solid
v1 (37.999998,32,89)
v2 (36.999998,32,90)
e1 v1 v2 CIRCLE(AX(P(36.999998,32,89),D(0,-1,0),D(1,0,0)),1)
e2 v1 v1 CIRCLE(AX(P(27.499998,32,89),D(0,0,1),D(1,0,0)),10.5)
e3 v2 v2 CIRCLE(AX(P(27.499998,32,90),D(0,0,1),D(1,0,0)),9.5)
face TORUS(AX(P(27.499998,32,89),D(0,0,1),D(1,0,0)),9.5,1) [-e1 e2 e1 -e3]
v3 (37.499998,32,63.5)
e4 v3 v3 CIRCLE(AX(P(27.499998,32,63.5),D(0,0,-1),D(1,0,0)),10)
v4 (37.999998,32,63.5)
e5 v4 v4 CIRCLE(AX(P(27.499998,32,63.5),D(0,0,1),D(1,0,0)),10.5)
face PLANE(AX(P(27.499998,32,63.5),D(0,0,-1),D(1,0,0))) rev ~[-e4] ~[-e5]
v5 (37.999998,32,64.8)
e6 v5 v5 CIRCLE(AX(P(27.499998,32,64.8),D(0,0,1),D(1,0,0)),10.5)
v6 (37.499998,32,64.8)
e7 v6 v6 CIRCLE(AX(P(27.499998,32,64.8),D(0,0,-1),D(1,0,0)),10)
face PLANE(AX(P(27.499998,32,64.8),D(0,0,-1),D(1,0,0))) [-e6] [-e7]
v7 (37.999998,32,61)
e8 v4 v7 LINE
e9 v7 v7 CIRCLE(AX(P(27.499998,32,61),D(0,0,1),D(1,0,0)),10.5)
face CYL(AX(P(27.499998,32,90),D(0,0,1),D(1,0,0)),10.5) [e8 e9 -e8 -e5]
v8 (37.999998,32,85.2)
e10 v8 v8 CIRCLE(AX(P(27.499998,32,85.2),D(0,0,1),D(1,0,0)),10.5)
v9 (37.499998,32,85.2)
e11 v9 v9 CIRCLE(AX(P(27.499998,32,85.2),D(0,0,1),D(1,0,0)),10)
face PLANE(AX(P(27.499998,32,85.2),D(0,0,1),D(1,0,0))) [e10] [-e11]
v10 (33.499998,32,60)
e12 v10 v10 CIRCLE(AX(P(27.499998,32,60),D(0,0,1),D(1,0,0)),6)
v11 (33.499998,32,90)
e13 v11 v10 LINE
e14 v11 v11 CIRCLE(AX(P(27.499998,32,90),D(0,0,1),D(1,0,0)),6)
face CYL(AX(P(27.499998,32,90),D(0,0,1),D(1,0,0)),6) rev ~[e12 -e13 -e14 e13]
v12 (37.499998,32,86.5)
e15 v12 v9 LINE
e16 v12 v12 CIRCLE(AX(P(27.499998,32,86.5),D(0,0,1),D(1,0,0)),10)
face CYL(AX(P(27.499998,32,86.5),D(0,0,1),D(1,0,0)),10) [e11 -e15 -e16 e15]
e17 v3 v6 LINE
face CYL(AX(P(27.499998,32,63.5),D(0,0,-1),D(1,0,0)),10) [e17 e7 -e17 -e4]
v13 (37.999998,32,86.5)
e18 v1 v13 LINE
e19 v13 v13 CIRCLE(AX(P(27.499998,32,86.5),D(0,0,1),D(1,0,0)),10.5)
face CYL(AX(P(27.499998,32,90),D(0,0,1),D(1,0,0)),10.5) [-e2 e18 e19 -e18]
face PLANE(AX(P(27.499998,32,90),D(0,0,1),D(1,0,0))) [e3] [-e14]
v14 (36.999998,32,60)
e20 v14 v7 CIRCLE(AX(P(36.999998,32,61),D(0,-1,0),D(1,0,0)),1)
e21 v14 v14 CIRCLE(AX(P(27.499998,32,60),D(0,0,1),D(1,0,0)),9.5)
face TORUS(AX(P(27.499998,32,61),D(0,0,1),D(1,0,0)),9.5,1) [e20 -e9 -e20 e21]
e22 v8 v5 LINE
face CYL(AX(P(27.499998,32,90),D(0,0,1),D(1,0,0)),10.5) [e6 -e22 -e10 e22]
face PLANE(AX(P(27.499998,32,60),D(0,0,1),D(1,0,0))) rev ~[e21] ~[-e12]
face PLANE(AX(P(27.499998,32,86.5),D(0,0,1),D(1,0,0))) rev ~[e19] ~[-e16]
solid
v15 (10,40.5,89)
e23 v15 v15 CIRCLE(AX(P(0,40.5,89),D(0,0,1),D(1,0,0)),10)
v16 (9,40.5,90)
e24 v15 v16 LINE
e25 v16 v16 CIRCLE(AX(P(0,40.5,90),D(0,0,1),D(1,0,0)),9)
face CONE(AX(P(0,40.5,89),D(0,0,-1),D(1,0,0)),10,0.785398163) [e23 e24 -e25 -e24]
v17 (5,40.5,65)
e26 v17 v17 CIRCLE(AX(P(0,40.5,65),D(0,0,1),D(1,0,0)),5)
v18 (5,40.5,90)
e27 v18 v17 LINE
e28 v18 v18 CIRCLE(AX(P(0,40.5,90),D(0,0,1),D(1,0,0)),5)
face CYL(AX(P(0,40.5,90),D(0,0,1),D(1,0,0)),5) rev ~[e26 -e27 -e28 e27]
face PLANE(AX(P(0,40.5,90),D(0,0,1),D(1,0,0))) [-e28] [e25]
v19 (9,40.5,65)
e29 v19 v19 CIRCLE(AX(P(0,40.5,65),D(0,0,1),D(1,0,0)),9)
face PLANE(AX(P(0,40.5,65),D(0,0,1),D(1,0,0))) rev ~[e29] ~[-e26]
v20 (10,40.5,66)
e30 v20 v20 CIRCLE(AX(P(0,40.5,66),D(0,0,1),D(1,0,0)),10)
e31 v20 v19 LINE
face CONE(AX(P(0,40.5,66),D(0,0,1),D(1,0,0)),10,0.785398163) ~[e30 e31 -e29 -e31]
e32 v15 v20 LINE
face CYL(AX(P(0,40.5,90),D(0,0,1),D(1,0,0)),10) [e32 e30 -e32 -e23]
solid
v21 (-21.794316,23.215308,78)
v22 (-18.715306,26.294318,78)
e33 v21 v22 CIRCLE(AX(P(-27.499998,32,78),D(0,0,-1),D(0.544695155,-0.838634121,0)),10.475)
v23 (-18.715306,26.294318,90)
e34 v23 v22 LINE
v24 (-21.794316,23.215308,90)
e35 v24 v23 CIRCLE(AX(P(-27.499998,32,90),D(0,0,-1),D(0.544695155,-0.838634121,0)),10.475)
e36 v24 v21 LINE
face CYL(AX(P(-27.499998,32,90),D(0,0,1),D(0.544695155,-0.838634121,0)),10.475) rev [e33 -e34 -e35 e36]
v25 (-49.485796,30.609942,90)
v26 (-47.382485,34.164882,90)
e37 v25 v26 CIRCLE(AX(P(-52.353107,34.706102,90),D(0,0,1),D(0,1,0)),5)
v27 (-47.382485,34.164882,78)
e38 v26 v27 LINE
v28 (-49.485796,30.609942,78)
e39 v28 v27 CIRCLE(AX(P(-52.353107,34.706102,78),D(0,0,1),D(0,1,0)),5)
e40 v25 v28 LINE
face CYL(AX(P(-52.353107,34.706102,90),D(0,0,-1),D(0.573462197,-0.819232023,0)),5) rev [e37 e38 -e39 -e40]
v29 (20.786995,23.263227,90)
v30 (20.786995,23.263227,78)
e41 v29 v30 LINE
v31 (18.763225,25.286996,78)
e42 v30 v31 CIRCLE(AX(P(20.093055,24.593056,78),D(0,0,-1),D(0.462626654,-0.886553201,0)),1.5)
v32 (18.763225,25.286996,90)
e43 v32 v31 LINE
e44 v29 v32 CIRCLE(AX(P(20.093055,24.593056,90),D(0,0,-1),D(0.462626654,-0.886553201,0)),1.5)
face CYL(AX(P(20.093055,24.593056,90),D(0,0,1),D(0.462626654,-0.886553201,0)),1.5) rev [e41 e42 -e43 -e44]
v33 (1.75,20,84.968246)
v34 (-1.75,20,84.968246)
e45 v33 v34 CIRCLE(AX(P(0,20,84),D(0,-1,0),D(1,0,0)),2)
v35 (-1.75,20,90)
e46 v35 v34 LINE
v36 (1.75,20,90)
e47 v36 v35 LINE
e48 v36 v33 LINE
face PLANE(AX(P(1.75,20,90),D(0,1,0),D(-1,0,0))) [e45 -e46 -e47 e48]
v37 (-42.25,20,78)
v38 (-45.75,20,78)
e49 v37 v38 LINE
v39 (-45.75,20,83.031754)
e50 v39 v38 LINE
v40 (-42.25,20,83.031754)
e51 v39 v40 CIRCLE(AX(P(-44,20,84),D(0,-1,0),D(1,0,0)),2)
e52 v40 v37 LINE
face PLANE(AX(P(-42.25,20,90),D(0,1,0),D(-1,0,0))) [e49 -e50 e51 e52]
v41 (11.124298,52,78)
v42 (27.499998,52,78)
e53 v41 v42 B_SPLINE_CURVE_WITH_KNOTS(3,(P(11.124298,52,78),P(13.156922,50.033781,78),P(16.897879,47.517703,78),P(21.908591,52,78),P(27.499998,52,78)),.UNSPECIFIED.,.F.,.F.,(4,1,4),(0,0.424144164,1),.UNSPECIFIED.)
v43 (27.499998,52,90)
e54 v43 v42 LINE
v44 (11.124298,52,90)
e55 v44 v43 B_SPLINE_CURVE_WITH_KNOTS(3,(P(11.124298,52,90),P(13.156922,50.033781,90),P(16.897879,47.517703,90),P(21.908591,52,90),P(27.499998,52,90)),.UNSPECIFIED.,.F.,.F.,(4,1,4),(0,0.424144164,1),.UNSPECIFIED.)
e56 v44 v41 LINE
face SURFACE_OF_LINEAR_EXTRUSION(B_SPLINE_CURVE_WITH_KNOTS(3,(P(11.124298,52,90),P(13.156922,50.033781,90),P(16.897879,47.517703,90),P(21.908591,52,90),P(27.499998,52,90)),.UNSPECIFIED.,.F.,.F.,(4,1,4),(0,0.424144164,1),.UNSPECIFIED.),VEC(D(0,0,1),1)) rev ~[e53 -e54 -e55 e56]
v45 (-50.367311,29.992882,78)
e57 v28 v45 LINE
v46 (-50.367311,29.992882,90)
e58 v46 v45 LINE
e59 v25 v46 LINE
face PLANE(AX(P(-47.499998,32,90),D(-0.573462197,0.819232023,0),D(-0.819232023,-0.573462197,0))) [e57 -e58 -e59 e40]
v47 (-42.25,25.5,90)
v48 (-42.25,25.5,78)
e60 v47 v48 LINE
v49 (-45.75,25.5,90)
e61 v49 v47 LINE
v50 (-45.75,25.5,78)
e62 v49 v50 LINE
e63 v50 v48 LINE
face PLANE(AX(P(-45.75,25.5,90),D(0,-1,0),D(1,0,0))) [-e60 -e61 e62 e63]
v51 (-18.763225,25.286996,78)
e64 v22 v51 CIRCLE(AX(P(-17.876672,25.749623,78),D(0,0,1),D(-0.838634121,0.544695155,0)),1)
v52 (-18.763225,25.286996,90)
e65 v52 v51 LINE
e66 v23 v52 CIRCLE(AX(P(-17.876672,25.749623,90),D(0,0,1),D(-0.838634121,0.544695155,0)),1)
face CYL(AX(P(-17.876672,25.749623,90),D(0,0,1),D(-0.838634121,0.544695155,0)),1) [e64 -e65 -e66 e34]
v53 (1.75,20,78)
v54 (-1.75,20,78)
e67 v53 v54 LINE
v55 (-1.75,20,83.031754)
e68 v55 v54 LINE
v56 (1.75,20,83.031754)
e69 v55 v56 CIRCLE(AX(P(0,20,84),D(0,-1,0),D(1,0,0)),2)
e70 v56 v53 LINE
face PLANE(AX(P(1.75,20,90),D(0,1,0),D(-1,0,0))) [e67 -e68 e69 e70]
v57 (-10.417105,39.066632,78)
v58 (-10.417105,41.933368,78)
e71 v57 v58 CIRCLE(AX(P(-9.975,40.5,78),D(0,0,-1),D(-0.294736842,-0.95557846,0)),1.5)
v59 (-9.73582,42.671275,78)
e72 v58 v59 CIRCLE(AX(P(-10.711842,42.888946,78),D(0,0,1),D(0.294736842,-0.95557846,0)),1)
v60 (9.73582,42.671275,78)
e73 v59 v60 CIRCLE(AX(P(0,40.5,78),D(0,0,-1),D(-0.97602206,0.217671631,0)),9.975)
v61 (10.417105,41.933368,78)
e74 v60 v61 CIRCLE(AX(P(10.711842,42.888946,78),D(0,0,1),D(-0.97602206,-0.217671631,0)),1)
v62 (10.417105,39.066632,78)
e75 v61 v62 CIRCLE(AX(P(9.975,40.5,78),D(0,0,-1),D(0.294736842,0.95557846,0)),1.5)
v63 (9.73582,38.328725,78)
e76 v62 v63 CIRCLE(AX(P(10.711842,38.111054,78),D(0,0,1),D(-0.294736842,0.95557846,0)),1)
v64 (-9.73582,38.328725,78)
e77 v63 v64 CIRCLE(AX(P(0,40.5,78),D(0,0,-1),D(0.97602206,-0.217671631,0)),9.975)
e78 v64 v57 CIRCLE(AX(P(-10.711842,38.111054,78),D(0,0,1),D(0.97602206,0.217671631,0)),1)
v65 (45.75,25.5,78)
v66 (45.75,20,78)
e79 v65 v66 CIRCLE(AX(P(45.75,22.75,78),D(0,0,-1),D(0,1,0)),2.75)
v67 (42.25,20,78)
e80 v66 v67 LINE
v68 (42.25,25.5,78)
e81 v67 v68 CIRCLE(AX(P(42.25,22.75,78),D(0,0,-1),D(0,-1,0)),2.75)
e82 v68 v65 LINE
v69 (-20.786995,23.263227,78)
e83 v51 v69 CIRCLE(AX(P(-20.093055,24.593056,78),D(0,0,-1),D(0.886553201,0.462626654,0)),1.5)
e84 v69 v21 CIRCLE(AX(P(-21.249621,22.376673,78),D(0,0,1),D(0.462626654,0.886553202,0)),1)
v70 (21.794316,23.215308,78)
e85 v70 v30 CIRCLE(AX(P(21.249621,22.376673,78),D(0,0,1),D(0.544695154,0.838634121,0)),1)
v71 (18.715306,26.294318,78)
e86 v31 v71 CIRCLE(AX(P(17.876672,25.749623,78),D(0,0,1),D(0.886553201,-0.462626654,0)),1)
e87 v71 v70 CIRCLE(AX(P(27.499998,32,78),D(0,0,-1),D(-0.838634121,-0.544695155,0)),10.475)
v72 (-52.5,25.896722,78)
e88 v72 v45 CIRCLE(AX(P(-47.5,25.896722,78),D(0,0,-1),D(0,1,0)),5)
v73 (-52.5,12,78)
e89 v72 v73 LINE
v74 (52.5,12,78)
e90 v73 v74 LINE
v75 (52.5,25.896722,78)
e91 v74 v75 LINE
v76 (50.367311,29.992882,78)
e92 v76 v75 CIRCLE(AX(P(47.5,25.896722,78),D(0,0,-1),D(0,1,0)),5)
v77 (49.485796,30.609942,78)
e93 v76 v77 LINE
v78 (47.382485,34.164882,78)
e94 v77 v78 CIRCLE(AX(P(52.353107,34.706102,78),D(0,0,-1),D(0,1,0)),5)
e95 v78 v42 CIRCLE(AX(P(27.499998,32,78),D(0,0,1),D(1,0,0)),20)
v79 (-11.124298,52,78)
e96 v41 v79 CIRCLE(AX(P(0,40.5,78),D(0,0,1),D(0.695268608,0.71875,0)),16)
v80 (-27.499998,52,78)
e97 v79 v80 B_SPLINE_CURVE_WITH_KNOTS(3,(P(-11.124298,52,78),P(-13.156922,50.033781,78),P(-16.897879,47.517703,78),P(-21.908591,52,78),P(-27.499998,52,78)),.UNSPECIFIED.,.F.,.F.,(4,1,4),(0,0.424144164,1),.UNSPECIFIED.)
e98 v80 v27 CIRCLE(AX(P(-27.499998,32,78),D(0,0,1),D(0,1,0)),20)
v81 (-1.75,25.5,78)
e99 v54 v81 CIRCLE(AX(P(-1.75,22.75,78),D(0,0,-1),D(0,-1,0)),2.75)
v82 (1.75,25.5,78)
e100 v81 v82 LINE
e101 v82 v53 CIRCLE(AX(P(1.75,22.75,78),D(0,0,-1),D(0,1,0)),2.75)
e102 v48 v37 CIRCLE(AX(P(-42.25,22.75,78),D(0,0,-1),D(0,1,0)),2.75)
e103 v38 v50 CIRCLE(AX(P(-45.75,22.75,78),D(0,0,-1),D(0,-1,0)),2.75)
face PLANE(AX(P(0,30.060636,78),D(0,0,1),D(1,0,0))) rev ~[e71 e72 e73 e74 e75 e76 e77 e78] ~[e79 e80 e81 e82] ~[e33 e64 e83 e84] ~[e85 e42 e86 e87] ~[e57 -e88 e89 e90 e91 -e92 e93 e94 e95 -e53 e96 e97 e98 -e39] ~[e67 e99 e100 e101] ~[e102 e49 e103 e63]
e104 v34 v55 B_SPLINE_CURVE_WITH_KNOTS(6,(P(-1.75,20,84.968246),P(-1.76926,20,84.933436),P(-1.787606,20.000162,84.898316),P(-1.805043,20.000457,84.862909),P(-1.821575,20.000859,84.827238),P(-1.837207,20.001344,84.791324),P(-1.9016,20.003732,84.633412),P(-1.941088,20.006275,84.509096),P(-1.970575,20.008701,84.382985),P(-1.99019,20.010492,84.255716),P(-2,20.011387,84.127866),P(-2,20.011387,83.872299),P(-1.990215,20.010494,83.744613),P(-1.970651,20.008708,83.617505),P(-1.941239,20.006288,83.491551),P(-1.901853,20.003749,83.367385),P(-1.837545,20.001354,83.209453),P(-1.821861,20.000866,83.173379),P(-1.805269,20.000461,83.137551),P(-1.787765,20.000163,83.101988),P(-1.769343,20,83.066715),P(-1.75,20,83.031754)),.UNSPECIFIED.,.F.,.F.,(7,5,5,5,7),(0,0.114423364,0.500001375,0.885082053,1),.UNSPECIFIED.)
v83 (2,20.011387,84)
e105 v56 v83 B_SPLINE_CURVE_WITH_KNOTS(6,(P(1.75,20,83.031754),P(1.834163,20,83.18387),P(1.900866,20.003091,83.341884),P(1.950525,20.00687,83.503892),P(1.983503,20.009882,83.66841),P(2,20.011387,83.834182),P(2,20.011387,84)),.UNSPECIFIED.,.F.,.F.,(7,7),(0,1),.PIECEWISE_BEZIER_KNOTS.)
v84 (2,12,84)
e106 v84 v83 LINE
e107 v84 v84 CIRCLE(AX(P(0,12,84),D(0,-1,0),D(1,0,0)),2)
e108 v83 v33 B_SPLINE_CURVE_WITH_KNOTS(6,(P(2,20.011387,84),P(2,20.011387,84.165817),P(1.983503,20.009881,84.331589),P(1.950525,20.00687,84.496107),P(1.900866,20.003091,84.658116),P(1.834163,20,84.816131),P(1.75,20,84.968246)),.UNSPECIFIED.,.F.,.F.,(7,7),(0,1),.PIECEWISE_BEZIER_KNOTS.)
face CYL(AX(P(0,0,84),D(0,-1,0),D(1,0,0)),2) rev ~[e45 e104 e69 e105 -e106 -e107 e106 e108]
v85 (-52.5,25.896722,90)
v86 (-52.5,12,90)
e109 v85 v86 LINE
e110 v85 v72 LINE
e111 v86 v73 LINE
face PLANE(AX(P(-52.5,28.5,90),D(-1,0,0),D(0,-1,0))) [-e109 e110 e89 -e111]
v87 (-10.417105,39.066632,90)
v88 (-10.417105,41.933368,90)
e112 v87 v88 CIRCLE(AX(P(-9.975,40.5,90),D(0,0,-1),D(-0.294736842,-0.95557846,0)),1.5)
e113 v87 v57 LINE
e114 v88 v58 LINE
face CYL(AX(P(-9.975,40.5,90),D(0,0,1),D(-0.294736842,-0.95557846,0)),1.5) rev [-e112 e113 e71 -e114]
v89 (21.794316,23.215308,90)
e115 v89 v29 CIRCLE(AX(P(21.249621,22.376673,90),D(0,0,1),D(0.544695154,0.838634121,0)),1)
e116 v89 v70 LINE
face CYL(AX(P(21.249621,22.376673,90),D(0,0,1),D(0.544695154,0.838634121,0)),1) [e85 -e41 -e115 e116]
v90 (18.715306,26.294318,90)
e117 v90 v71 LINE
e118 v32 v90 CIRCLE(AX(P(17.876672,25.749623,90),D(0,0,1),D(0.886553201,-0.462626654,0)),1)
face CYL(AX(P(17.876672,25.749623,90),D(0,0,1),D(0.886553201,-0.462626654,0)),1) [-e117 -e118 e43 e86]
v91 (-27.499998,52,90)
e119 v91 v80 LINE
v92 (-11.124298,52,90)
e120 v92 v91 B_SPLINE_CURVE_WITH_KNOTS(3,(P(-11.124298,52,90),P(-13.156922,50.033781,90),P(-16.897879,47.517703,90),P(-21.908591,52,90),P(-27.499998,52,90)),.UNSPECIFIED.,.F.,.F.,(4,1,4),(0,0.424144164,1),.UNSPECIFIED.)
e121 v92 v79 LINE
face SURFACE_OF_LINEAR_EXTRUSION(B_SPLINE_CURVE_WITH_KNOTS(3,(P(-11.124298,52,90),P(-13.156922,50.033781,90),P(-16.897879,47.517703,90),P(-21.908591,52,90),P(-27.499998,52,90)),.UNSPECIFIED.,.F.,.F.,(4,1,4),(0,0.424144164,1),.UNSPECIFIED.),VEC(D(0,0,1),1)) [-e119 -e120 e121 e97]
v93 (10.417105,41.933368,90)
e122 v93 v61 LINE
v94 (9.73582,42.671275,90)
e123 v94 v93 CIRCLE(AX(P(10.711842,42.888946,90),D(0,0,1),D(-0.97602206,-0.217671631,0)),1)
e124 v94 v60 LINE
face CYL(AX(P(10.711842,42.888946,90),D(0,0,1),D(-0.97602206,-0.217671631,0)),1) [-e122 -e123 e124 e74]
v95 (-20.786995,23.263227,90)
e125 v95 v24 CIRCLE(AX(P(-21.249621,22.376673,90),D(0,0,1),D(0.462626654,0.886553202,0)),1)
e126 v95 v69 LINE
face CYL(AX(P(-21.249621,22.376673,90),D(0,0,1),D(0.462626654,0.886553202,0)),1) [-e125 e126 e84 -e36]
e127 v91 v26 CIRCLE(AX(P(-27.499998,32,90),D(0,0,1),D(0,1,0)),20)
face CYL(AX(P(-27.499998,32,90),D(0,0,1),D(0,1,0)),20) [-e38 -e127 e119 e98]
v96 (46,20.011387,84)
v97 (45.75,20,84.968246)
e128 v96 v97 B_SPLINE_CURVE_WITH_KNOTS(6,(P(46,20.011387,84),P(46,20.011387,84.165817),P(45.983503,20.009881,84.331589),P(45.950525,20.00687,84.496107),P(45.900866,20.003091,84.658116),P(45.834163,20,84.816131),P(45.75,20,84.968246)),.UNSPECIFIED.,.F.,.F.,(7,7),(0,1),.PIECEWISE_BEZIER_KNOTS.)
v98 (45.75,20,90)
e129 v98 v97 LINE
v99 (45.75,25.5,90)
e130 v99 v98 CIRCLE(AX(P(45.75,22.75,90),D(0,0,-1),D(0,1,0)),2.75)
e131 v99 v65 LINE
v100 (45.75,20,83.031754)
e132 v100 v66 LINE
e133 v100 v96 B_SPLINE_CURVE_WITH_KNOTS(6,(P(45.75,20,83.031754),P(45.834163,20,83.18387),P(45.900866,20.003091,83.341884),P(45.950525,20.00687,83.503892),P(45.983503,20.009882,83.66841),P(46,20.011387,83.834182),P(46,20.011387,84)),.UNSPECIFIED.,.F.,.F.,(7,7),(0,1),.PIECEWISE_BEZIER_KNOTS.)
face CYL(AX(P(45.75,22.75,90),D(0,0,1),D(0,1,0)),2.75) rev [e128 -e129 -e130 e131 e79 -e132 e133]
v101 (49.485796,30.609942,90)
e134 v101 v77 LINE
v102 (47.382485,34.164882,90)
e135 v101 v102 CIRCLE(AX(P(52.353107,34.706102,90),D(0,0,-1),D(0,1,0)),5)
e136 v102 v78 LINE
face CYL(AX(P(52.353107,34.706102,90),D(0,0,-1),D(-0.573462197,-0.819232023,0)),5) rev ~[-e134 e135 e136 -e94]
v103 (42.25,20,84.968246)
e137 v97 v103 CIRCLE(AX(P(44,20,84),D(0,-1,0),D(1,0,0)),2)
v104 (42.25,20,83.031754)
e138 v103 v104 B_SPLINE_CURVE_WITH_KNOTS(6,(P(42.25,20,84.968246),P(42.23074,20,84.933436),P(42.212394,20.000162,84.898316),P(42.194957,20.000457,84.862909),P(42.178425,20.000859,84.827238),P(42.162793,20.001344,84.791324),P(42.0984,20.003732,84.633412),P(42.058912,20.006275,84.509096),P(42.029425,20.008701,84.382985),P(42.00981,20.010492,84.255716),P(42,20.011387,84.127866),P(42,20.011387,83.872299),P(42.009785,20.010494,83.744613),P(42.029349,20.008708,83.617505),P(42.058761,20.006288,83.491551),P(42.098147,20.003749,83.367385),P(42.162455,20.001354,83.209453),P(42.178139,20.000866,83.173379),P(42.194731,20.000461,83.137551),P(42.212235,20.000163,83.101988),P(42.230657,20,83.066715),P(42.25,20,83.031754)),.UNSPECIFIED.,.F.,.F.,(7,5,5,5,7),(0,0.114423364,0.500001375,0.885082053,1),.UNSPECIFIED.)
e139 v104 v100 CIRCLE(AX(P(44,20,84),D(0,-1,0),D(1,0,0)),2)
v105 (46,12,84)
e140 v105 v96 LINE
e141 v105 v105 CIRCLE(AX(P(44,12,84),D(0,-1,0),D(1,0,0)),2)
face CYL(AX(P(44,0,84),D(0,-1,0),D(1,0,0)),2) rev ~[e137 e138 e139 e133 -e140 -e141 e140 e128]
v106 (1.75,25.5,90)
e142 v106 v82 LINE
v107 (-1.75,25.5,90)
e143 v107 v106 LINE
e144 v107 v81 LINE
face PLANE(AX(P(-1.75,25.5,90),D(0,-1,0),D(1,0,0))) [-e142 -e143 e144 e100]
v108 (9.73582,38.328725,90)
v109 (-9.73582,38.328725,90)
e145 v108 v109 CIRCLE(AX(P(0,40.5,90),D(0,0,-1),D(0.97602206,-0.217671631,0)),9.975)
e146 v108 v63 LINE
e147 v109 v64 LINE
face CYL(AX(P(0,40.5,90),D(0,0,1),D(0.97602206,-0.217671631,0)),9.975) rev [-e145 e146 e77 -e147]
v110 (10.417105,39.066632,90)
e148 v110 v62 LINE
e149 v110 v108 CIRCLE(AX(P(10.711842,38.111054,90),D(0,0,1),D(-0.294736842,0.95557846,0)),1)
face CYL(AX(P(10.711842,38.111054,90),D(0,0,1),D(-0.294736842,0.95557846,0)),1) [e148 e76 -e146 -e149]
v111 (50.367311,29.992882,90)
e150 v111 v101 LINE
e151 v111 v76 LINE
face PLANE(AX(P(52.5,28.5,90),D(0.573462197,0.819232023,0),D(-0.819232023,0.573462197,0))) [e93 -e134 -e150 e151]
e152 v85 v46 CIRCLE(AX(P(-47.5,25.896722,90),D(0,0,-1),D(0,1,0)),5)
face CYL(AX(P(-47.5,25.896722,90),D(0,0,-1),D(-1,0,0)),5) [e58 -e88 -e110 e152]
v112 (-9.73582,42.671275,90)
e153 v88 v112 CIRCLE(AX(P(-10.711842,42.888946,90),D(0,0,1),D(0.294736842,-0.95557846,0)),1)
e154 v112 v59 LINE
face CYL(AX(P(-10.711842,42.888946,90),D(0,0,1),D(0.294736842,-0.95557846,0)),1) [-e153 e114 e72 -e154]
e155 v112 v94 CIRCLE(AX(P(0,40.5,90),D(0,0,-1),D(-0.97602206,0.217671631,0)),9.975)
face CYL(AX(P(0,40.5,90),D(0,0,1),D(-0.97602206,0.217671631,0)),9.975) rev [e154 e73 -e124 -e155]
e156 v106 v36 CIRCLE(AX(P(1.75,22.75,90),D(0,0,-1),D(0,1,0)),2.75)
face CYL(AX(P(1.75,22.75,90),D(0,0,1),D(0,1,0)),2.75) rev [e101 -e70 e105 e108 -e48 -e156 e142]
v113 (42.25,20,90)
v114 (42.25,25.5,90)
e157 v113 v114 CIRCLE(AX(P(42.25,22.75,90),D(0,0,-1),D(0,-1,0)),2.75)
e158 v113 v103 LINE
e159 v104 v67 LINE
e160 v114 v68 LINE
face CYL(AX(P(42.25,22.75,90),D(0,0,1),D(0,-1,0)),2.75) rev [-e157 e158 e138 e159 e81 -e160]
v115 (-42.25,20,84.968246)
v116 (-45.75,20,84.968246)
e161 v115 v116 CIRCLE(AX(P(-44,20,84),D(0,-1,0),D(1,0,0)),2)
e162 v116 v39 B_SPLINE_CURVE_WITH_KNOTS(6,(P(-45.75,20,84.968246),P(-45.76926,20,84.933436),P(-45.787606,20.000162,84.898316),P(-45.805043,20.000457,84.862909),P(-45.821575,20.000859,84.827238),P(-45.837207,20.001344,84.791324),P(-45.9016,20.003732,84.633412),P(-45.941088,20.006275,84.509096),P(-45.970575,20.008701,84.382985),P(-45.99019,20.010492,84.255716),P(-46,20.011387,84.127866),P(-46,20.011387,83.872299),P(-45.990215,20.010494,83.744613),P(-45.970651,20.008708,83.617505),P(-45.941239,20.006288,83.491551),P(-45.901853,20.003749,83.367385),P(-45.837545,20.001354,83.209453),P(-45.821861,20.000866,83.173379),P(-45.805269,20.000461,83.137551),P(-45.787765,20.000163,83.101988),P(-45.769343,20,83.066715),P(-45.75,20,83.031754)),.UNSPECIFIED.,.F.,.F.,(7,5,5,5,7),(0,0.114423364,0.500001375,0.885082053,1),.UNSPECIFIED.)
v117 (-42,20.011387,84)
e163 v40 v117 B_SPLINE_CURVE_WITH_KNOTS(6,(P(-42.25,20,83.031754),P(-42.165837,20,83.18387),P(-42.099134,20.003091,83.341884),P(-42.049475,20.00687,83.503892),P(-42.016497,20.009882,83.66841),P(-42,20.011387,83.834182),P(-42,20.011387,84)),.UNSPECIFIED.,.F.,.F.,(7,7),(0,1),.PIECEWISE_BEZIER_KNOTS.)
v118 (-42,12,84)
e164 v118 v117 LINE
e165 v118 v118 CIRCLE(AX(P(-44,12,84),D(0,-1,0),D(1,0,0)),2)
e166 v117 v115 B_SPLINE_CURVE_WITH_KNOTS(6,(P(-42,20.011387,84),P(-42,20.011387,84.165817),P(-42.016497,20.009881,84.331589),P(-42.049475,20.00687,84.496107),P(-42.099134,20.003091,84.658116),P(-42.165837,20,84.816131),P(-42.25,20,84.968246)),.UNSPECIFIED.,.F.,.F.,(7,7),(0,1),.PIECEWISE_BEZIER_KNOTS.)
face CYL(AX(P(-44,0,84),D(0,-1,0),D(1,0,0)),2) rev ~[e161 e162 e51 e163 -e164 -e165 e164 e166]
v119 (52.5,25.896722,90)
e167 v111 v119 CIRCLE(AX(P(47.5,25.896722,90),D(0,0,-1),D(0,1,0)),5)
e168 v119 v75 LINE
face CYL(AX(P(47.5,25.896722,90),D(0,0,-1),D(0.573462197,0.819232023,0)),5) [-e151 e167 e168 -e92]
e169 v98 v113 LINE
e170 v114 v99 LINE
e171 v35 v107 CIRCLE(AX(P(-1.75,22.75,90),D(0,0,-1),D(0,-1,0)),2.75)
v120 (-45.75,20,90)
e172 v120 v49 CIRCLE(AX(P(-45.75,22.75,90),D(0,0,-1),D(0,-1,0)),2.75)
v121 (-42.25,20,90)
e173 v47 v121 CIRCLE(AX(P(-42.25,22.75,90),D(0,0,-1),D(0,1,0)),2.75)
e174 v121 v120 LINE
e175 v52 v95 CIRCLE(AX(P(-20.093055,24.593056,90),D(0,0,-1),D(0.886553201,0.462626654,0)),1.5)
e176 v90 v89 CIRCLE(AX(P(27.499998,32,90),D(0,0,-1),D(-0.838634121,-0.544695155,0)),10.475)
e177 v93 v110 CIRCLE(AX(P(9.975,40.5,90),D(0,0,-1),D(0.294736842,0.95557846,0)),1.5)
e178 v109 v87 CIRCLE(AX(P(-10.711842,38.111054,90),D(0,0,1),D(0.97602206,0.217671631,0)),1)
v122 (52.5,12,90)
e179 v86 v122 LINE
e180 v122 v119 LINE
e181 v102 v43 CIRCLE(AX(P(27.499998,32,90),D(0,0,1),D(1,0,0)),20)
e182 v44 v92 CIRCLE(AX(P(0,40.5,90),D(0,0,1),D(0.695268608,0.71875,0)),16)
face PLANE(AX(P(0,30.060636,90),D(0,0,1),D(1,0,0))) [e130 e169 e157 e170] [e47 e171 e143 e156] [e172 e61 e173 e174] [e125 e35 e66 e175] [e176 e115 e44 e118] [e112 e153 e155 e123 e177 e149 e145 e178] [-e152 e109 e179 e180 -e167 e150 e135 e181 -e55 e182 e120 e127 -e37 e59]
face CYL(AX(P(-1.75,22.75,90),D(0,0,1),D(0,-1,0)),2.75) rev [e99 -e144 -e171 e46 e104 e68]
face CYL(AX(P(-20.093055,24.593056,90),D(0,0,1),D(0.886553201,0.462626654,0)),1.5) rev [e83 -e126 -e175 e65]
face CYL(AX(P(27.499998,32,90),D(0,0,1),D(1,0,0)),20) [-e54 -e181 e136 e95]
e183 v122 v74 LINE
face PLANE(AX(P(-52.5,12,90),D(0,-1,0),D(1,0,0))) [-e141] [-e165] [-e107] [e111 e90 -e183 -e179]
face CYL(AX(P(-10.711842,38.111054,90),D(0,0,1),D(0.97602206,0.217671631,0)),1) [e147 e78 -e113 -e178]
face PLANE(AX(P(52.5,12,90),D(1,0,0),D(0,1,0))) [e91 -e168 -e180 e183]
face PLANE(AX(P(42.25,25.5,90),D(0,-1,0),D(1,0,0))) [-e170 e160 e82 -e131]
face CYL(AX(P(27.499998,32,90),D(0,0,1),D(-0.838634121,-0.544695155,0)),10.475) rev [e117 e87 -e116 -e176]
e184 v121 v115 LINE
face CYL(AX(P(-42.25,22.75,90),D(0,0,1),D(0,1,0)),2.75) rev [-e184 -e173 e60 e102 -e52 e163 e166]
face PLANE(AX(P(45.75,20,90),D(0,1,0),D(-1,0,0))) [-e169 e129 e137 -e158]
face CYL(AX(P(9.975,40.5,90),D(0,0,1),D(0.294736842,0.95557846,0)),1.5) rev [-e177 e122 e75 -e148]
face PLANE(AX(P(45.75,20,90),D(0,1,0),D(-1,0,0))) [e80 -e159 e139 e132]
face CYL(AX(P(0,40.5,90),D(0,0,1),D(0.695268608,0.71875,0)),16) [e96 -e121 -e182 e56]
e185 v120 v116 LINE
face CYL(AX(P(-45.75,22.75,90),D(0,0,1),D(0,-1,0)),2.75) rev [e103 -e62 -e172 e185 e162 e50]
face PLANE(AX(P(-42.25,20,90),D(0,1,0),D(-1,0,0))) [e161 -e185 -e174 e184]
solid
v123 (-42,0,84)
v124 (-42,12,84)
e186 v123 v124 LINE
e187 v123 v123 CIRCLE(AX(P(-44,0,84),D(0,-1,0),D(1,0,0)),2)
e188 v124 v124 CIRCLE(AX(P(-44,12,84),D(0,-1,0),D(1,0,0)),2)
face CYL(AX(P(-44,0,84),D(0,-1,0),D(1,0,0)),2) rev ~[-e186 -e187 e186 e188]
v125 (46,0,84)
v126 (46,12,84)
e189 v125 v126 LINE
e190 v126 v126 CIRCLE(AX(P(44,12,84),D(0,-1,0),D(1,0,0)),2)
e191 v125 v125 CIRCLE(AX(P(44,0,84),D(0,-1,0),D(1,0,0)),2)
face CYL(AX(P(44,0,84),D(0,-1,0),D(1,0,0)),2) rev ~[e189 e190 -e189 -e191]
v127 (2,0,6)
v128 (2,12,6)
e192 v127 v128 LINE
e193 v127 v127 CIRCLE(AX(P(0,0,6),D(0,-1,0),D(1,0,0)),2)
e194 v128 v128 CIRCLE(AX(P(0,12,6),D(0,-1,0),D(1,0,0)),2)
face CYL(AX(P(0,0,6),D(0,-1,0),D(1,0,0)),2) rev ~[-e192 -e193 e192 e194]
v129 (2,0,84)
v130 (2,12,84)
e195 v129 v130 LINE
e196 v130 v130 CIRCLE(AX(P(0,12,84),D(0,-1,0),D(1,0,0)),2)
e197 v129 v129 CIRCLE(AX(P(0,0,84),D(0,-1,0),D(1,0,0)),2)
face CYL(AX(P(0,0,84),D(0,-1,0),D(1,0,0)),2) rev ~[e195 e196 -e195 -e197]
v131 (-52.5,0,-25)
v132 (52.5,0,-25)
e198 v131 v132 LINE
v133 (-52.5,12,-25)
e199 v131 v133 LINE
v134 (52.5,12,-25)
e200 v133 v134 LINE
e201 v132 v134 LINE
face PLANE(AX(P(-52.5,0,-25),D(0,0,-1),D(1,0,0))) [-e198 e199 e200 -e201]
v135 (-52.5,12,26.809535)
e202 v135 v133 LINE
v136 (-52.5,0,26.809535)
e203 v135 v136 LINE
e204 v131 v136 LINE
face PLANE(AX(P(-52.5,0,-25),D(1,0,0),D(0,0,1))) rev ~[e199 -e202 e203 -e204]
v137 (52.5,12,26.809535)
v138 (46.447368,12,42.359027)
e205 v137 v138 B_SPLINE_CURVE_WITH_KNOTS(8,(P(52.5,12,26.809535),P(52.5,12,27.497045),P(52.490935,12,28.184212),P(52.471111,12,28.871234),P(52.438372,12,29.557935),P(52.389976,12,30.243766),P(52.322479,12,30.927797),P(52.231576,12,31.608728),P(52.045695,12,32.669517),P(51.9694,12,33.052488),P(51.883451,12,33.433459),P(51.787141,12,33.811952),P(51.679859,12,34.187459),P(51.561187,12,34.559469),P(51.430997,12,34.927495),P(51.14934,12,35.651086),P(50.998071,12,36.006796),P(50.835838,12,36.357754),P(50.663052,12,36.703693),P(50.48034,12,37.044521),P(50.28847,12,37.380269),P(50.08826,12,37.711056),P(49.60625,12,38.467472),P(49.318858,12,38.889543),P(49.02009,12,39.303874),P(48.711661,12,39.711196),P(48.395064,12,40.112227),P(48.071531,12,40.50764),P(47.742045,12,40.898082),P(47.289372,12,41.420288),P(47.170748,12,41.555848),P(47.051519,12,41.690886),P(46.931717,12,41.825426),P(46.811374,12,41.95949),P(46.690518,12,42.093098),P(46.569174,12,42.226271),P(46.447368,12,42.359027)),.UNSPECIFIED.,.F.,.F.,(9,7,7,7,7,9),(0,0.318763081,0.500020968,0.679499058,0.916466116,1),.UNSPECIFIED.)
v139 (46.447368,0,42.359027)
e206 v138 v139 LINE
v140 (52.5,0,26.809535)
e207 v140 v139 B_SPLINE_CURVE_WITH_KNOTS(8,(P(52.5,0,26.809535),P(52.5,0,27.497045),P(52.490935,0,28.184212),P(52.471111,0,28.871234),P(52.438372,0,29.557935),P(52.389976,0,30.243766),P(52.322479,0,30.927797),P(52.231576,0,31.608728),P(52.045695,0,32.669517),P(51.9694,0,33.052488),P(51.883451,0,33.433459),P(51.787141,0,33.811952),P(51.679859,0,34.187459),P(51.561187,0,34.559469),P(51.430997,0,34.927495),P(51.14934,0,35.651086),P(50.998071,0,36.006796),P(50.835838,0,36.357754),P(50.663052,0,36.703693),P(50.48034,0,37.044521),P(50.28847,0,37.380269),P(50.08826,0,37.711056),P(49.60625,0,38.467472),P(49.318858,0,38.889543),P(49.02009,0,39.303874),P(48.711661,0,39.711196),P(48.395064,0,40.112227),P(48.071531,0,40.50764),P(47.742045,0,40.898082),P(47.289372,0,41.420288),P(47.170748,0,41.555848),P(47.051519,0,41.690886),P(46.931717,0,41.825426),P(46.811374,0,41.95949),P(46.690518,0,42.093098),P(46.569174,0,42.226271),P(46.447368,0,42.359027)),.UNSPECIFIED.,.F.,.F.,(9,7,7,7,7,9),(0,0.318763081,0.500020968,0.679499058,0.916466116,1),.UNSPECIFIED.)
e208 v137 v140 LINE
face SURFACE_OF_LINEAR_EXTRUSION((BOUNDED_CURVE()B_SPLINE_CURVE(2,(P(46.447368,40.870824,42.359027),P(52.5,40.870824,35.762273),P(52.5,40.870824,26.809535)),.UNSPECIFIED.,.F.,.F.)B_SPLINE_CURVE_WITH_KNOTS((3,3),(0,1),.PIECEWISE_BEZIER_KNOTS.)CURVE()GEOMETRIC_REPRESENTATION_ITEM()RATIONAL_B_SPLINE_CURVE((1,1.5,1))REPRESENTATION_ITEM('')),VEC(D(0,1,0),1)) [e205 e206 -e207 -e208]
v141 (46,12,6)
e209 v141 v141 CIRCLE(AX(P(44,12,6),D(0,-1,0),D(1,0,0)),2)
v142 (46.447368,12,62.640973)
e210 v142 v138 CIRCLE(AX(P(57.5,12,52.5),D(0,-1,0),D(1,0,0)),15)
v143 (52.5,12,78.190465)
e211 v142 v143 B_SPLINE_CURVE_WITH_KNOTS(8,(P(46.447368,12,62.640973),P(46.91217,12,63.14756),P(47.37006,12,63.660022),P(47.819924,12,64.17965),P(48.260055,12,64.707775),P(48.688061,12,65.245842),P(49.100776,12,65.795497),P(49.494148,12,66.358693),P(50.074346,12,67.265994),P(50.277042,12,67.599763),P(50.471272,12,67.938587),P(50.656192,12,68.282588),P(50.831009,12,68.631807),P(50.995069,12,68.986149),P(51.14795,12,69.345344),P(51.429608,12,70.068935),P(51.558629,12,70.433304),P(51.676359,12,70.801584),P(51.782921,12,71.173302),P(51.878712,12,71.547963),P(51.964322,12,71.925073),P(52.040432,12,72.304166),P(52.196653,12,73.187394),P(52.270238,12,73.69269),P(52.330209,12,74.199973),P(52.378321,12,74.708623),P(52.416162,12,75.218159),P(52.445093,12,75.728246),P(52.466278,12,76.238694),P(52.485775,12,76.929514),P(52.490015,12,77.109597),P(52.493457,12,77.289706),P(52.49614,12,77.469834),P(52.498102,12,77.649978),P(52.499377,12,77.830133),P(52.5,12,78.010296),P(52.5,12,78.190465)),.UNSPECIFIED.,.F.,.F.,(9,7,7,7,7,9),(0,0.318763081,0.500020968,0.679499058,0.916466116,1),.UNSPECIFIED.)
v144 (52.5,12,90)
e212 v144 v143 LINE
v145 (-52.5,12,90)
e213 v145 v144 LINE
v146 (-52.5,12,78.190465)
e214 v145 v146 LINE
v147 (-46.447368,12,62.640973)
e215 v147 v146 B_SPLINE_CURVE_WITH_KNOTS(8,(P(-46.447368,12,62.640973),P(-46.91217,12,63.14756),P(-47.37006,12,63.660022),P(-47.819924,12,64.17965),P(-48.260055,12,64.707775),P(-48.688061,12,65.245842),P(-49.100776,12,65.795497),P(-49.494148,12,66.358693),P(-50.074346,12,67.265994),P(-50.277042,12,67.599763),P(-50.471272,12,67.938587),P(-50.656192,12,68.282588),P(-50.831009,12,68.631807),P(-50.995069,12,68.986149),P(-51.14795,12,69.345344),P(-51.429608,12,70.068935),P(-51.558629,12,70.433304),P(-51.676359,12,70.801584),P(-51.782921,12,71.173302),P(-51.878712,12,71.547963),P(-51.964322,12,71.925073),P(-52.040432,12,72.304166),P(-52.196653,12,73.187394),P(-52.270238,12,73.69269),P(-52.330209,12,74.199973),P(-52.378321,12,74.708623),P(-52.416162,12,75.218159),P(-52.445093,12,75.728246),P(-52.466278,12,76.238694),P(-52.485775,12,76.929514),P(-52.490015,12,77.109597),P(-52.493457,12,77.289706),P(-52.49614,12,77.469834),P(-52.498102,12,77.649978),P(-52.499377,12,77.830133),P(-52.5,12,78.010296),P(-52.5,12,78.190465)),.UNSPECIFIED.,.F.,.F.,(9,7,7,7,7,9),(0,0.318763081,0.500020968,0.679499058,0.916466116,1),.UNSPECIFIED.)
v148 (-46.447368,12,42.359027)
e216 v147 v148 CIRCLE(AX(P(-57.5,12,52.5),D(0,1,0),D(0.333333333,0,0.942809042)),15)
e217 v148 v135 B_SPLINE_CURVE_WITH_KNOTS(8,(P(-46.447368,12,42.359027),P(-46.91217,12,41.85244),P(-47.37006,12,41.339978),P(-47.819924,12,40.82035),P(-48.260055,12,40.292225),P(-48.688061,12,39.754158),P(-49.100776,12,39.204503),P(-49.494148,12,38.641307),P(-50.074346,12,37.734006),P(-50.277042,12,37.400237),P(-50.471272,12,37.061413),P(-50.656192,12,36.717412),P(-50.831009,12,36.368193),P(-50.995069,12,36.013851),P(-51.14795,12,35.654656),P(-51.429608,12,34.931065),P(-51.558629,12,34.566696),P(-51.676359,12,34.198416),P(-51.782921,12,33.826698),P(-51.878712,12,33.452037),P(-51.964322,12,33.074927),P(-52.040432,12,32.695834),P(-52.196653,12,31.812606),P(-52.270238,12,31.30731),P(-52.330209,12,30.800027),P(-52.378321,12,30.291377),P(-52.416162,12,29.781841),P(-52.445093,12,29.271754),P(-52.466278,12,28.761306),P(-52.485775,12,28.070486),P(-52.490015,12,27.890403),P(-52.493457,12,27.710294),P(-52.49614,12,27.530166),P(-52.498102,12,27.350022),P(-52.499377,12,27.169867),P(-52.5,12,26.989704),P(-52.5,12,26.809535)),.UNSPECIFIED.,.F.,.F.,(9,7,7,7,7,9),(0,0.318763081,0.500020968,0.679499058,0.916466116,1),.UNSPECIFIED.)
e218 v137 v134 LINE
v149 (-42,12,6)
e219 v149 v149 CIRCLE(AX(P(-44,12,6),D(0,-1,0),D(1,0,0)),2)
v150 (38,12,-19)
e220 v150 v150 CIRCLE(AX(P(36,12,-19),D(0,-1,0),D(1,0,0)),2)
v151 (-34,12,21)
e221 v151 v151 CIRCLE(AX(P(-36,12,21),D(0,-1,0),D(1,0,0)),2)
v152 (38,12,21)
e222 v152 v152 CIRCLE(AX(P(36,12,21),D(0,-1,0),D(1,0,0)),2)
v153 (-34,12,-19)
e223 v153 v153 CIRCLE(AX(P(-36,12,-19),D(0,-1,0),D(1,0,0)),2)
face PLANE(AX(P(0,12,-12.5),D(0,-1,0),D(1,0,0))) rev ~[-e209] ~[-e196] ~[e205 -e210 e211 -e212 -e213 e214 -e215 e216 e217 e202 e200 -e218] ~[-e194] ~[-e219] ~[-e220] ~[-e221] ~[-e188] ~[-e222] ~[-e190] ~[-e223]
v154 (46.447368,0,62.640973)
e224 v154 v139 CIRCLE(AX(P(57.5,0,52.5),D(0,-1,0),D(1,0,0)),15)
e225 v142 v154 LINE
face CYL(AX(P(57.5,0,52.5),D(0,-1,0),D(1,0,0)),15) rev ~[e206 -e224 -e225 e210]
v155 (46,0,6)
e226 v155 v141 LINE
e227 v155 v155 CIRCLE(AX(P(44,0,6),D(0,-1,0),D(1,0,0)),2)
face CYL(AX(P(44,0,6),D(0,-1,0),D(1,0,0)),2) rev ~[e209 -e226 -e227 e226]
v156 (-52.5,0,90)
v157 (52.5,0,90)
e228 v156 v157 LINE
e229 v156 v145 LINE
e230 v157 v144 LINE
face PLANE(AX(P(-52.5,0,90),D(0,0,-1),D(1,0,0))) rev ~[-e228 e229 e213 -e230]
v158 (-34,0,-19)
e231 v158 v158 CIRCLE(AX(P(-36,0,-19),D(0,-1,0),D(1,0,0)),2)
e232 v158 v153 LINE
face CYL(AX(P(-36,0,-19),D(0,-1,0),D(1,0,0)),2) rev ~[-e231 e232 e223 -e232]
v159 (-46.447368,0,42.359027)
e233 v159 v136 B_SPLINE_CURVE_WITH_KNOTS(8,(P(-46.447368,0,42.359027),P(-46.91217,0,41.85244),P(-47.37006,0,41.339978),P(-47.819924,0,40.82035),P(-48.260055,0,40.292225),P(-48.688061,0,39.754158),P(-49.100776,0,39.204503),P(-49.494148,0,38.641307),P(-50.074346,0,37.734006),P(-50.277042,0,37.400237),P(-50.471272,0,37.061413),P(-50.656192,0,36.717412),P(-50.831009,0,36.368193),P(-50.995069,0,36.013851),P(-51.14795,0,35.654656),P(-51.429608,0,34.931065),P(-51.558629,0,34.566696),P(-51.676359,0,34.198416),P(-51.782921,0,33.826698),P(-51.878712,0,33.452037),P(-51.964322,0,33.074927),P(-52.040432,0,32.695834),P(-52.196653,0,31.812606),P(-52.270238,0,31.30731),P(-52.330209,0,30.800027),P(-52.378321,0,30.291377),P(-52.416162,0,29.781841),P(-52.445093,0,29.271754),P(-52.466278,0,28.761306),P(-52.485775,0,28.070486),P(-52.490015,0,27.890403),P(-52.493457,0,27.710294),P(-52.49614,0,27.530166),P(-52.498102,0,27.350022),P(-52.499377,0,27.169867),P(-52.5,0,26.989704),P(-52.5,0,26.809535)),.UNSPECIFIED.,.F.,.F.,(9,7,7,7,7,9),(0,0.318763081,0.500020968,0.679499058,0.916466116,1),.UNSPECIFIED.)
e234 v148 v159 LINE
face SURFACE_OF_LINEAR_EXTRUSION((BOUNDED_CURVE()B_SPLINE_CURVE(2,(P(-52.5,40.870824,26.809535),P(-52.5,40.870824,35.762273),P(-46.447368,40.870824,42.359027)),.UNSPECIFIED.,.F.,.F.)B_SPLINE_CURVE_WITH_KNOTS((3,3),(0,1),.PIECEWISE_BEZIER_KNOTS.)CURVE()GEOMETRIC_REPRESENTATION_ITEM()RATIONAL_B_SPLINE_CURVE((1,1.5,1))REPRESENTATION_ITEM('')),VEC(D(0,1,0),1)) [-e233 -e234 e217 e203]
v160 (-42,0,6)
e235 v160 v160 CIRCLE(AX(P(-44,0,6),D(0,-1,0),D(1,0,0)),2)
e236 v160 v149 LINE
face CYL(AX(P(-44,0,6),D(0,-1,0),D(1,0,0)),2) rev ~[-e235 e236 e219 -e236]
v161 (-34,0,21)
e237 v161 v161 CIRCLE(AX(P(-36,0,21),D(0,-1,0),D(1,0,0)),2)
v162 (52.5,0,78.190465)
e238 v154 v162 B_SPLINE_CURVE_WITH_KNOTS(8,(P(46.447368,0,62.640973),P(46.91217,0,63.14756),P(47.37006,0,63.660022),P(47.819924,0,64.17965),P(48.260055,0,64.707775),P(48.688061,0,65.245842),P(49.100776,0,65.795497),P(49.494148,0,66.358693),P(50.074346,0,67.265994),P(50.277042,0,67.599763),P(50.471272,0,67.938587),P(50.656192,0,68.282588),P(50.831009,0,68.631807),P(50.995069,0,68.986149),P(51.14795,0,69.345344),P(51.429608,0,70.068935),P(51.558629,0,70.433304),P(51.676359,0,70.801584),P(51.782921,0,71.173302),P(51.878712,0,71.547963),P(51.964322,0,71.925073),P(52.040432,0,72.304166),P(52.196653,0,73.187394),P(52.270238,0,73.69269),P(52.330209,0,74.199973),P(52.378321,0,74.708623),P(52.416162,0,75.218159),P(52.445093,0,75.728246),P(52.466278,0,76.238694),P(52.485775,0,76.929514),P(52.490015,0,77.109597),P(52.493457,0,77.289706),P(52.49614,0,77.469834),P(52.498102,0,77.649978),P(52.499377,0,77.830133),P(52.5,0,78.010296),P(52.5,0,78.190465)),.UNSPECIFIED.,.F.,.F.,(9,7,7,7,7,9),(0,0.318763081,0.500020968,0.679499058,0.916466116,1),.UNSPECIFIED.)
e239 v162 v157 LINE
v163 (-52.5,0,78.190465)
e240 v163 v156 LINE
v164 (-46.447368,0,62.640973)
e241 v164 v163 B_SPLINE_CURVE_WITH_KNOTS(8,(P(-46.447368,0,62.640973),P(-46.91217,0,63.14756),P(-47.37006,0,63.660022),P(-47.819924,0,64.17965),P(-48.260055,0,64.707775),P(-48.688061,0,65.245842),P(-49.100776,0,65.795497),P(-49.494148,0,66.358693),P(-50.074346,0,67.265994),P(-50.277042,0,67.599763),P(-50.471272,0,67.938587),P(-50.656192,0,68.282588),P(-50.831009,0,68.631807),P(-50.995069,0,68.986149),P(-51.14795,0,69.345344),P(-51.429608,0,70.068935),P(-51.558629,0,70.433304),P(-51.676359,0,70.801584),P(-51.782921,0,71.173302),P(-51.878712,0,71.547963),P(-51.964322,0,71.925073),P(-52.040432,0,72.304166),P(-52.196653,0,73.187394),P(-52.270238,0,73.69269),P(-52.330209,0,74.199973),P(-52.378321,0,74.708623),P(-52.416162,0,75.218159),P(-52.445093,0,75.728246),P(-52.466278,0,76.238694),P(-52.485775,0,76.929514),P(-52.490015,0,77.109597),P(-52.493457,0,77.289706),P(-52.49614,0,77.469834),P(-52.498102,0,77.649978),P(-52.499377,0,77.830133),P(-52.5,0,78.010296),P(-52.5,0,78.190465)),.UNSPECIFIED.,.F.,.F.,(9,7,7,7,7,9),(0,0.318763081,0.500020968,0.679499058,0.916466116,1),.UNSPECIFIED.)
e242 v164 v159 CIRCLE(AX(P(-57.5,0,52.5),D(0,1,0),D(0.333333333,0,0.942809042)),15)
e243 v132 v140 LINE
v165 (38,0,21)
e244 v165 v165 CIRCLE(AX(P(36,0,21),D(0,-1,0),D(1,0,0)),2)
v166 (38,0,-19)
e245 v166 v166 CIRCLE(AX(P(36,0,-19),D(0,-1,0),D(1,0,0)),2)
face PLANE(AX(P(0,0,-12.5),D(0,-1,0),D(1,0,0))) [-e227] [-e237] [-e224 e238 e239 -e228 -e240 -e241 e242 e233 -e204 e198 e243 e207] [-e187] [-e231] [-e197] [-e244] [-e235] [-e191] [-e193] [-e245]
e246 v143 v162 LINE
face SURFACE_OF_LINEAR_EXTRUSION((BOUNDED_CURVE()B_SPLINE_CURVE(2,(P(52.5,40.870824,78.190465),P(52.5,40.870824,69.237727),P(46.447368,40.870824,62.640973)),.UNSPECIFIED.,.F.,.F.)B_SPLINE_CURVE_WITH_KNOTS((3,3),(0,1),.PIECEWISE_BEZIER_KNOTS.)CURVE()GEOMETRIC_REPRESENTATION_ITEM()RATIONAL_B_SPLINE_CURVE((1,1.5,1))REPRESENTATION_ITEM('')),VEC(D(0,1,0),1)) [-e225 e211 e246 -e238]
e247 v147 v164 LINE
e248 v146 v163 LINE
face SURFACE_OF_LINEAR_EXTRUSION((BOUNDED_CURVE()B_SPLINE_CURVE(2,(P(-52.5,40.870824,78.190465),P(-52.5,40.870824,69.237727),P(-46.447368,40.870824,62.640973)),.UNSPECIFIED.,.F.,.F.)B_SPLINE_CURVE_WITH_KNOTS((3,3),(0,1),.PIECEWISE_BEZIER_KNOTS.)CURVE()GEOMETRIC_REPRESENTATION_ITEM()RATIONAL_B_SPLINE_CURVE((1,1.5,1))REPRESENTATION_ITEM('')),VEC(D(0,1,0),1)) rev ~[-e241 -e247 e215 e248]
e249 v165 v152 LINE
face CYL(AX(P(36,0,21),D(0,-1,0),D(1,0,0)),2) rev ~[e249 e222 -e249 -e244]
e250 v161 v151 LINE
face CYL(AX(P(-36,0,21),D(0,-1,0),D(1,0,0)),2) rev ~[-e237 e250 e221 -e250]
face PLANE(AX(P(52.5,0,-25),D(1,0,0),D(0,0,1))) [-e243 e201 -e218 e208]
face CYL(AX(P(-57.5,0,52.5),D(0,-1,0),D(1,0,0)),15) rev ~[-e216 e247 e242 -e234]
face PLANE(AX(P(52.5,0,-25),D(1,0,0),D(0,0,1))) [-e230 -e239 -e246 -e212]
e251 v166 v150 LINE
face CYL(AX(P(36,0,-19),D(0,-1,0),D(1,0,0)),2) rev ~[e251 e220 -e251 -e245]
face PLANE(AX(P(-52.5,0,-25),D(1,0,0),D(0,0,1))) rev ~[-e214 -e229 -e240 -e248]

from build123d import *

# Parameters (mm, degrees)
F0_W         = 105
F0_H         = 90
F1_DEPTH     = 12
F3_DEPTH     = 12
F4_R         = 5
F5_R         = 10.5
F5_R_2       = 6
F6_DEPTH     = 30
F8_START     = -3.5
F7_R         = 13.9480454754
F7_R_2       = 10
F8_DEPTH     = 1.3
F10_START    = -3.5
F9_R         = 14.6955703702
F9_R_2       = 10
F10_DEPTH    = 1.3
F11_R        = 1
F12_W        = 105
F12_H        = 25
F13_DEPTH    = 12
F14_R        = 10
F14_R_2      = 5
F15_DEPTH    = 25
F16_R        = 2
F17_DEPTH    = 25
F18_SIZE     = 1
F19_R        = 15
F20_DEPTH    = 25
F21_T1_DEPTH = 69.741647668


# Not quite as in the source:
# - a fillet or chamfer that OpenCascade refuses, or shapes differently, is made with other operations: its cross-section is extruded or revolved along the edge and cut away or added


with BuildPart() as f1:
    # F0 (on Front) → F1 (new body)
    with BuildSketch(Plane.XZ):
        with Locations((0, 45)):
            Rectangle(F0_W, F0_H)
    extrude(amount=-F1_DEPTH)

    # F12 (on face) → F13 (join, through all)
    with BuildSketch(Plane.XZ):
        with Locations((0, -12.5)):
            Rectangle(F12_W, F12_H)
    extrude(amount=-F13_DEPTH)


with BuildPart() as f3:
    # F2 (on face) → F3 (new body)
    with BuildSketch(Plane.XY.offset(90)):
        with BuildLine():
            Line((52.5, 28.5), (47.4999980907, 32))
            ThreePointArc((47.4999980907, 32), (41.6421337144, 46.1421356237), (27.4999980907, 52))
            add(Edge.make_bspline(
                [(11.1242977306, 52), (13.1569224157, 50.0337806808), (16.8978786945, 47.5177026437), (21.9085912172, 52), (27.4999980907, 52)],
                knots=[0, 0, 0, 0, 0.4241441638, 1, 1, 1, 1], degree=3))
            ThreePointArc((11.1242977306, 52), (0, 56.5), (-11.1242977306, 52))
            add(Edge.make_bspline(
                [(-11.1242977306, 52), (-13.1569224157, 50.0337806808), (-16.8978786945, 47.5177026437), (-21.9085912172, 52), (-27.4999980907, 52)],
                knots=[0, 0, 0, 0, 0.4241441638, 1, 1, 1, 1], degree=3))
            ThreePointArc((-27.4999980907, 52), (-41.6421337144, 46.1421356237), (-47.4999980907, 32))
            Line((-47.4999980907, 32), (-52.5, 28.5))
            Line((-52.5, 28.5), (-52.5, 12))
            Line((-52.5, 12), (-47.5, 12))
            Line((-47.5, 12), (47.5, 12))
            Line((47.5, 12), (52.5, 12))
            Line((52.5, 12), (52.5, 28.5))
        make_face()
        with BuildLine():
            Line((-45.75, 25.5), (-42.25, 25.5))
            ThreePointArc((-42.25, 25.5), (-39.5, 22.75), (-42.25, 20))
            Line((-42.25, 20), (-45.75, 20))
            ThreePointArc((-45.75, 20), (-48.5, 22.75), (-45.75, 25.5))
        make_face(mode=Mode.SUBTRACT)
        with BuildLine():
            ThreePointArc((-20.7869945386, 23.2632266648), (-21.2971382344, 23.3755438907), (-21.794316347, 23.2153075842))
            ThreePointArc((-21.794316347, 23.2153075842), (-34.9069416236, 39.4069435329), (-18.7153056748, 26.2943182564))
            ThreePointArc((-18.7153056748, 26.2943182564), (-18.8755419814, 25.7971401438), (-18.7632247555, 25.286996448))
            ThreePointArc((-18.7632247555, 25.286996448), (-19.0323943859, 23.5323962953), (-20.7869945386, 23.2632266648))
        make_face(mode=Mode.SUBTRACT)
        with BuildLine():
            ThreePointArc((-1.75, 20), (-4.5, 22.75), (-1.75, 25.5))
            Line((-1.75, 25.5), (1.75, 25.5))
            ThreePointArc((1.75, 25.5), (4.5, 22.75), (1.75, 20))
            Line((1.75, 20), (-1.75, 20))
        make_face(mode=Mode.SUBTRACT)
        with BuildLine():
            ThreePointArc((42.25, 20), (39.5, 22.75), (42.25, 25.5))
            Line((42.25, 25.5), (45.75, 25.5))
            ThreePointArc((45.75, 25.5), (48.5, 22.75), (45.75, 20))
            Line((45.75, 20), (42.25, 20))
        make_face(mode=Mode.SUBTRACT)
        with BuildLine():
            ThreePointArc((18.7153056748, 26.2943182564), (34.9069416236, 39.4069435329), (21.794316347, 23.2153075842))
            ThreePointArc((21.794316347, 23.2153075842), (21.2971382344, 23.3755438907), (20.7869945386, 23.2632266648))
            ThreePointArc((20.7869945386, 23.2632266648), (19.0323943859, 23.5323962953), (18.7632247555, 25.286996448))
            ThreePointArc((18.7632247555, 25.286996448), (18.8755419814, 25.7971401438), (18.7153056748, 26.2943182564))
        make_face(mode=Mode.SUBTRACT)
        with BuildLine():
            ThreePointArc((9.7358200456, 38.3287254802), (0, 30.525), (-9.7358200456, 38.3287254802))
            ThreePointArc((-9.7358200456, 38.3287254802), (-9.9771083652, 38.7894094573), (-10.4171052632, 39.0666323095))
            ThreePointArc((-10.4171052632, 39.0666323095), (-11.475, 40.5), (-10.4171052632, 41.9333676905))
            ThreePointArc((-10.4171052632, 41.9333676905), (-9.9771083652, 42.2105905427), (-9.7358200456, 42.6712745198))
            ThreePointArc((-9.7358200456, 42.6712745198), (0, 50.475), (9.7358200456, 42.6712745198))
            ThreePointArc((9.7358200456, 42.6712745198), (9.9771083652, 42.2105905427), (10.4171052632, 41.9333676905))
            ThreePointArc((10.4171052632, 41.9333676905), (11.475, 40.5), (10.4171052632, 39.0666323095))
            ThreePointArc((10.4171052632, 39.0666323095), (9.9771083652, 38.7894094573), (9.7358200456, 38.3287254802))
        make_face(mode=Mode.SUBTRACT)
    extrude(amount=-F3_DEPTH)

    # F4
    f4_edges = [f3.edges().sort_by_distance(p)[0] for p in [
        (-47.499998, 32, 84),
        (-52.5, 28.5, 84),
        (47.499998, 32, 84),
        (52.5, 28.5, 84),
    ]]
    fillet(f4_edges, radius=F4_R)


with BuildPart() as f6:
    # F5 (on face) → F6 (new body)
    with BuildSketch(Plane.XY.offset(90)):
        with Locations((27.4999980907, 32)):
            Circle(F5_R)
        with Locations((27.4999980907, 32)):
            Circle(F5_R_2, mode=Mode.SUBTRACT)
    extrude(amount=-F6_DEPTH)

    # F7 (on face) → F8 (cut)
    with BuildSketch(Plane.XY.offset(90).offset(F8_START)):
        with Locations((27.4999980907, 32)):
            Circle(F7_R)
        with Locations((27.4999980907, 32)):
            Circle(F7_R_2, mode=Mode.SUBTRACT)
    extrude(amount=-F8_DEPTH, mode=Mode.SUBTRACT)

    # F9 (on face) → F10 (cut)
    with BuildSketch(Plane(origin=(0, 0, 60), x_dir=(1, 0, 0), z_dir=(0, 0, -1)).offset(F10_START)):
        with Locations((27.4999980907, -32)):
            Circle(F9_R)
        with Locations((27.4999980907, -32)):
            Circle(F9_R_2, mode=Mode.SUBTRACT)
    extrude(amount=-F10_DEPTH, mode=Mode.SUBTRACT)

    # F11
    f11_edges = [f6.edges().sort_by_distance(p)[0] for p in [
        (16.999998, 32, 90),
        (16.999998, 32, 60),
    ]]
    fillet(f11_edges, radius=F11_R)


with BuildPart() as f15:
    # F14 (on face) → F15 (new body)
    with BuildSketch(Plane.XY.offset(90)):
        with Locations((0, 40.5)):
            Circle(F14_R)
        with Locations((0, 40.5)):
            Circle(F14_R_2, mode=Mode.SUBTRACT)
    extrude(amount=-F15_DEPTH)

    # F18
    f18_edges = [f15.edges().sort_by_distance(p)[0] for p in [
        (-10, 40.5, 65),
        (-10, 40.5, 90),
    ]]
    chamfer(f18_edges, length=F18_SIZE)


with BuildPart() as f17_tool:
    # F16 (on face) → F17 (new body)
    with BuildSketch(Plane.XZ):
        with Locations((-44, 84)):
            Circle(F16_R)
        with Locations((44, 84)):
            Circle(F16_R)
        with Locations((0, 84)):
            Circle(F16_R)
        with Locations((44, 6)):
            Circle(F16_R)
        with Locations((0, 6)):
            Circle(F16_R)
        with Locations((-44, 6)):
            Circle(F16_R)
        with Locations((-36, -19)):
            Circle(F16_R)
        with Locations((36, -19)):
            Circle(F16_R)
        with Locations((36, 21)):
            Circle(F16_R)
        with Locations((-36, 21)):
            Circle(F16_R)
    extrude(amount=-F17_DEPTH)


with BuildPart() as f1_1:
    add(f1.part)

    # F17: cut by f17_tool
    add(f17_tool.part, mode=Mode.SUBTRACT)

    # F19 (on face) → F20 (cut)
    with BuildSketch(Plane.XZ):
        with Locations((-57.5, 52.5)):
            Circle(F19_R)
        with Locations((57.5, 52.5)):
            Circle(F19_R)
    extrude(amount=-F20_DEPTH, mode=Mode.SUBTRACT)

    # F21: fillet of radius 23 on 4 edges, made by hand

    # F21_s2 → F21_t1 (cut)
    with BuildSketch(Plane.XZ.offset(-40.870823834)):
        with BuildLine():
            add(Edge.make_bspline(
                [(-52.5, 78.1904651573), (-52.5, 69.2377272995), (-46.4473684211, 62.6409730884)],
                knots=[0, 0, 0, 1, 1, 1], degree=2, weights=[1, 1.5, 1]))
            ThreePointArc((-46.4473684211, 62.6409730884), (-49.2281156584, 65.0130303859), (-52.5, 66.6421356237))
            Line((-52.5, 66.6421356237), (-52.5, 78.1904651573))
        make_face()
        with BuildLine():
            add(Edge.make_bspline(
                [(-52.5, 26.8095348427), (-52.5, 35.7622727005), (-46.4473684211, 42.3590269116)],
                knots=[0, 0, 0, 1, 1, 1], degree=2, weights=[1, 1.5, 1]))
            ThreePointArc((-46.4473684211, 42.3590269116), (-49.2281156584, 39.9869696141), (-52.5, 38.3578643763))
            Line((-52.5, 38.3578643763), (-52.5, 26.8095348427))
        make_face()
        with BuildLine():
            add(Edge.make_bspline(
                [(52.5, 78.1904651573), (52.5, 69.2377272995), (46.4473684211, 62.6409730884)],
                knots=[0, 0, 0, 1, 1, 1], degree=2, weights=[1, 1.5, 1]))
            ThreePointArc((46.4473684211, 62.6409730884), (49.2281156584, 65.0130303859), (52.5, 66.6421356237))
            Line((52.5, 66.6421356237), (52.5, 78.1904651573))
        make_face()
        with BuildLine():
            add(Edge.make_bspline(
                [(46.4473684211, 42.3590269116), (52.5, 35.7622727005), (52.5, 26.8095348427)],
                knots=[0, 0, 0, 1, 1, 1], degree=2, weights=[1, 1.5, 1]))
            Line((52.5, 26.8095348427), (52.5, 38.3578643763))
            ThreePointArc((52.5, 38.3578643763), (49.2281156584, 39.9869696141), (46.4473684211, 42.3590269116))
        make_face()
    extrude(amount=F21_T1_DEPTH, mode=Mode.SUBTRACT)


with BuildPart() as f3_1:
    add(f3.part)

    # F17: cut by f17_tool
    add(f17_tool.part, mode=Mode.SUBTRACT)


solid = Compound([f6.part, f15.part, f1_1.part, f3_1.part])
